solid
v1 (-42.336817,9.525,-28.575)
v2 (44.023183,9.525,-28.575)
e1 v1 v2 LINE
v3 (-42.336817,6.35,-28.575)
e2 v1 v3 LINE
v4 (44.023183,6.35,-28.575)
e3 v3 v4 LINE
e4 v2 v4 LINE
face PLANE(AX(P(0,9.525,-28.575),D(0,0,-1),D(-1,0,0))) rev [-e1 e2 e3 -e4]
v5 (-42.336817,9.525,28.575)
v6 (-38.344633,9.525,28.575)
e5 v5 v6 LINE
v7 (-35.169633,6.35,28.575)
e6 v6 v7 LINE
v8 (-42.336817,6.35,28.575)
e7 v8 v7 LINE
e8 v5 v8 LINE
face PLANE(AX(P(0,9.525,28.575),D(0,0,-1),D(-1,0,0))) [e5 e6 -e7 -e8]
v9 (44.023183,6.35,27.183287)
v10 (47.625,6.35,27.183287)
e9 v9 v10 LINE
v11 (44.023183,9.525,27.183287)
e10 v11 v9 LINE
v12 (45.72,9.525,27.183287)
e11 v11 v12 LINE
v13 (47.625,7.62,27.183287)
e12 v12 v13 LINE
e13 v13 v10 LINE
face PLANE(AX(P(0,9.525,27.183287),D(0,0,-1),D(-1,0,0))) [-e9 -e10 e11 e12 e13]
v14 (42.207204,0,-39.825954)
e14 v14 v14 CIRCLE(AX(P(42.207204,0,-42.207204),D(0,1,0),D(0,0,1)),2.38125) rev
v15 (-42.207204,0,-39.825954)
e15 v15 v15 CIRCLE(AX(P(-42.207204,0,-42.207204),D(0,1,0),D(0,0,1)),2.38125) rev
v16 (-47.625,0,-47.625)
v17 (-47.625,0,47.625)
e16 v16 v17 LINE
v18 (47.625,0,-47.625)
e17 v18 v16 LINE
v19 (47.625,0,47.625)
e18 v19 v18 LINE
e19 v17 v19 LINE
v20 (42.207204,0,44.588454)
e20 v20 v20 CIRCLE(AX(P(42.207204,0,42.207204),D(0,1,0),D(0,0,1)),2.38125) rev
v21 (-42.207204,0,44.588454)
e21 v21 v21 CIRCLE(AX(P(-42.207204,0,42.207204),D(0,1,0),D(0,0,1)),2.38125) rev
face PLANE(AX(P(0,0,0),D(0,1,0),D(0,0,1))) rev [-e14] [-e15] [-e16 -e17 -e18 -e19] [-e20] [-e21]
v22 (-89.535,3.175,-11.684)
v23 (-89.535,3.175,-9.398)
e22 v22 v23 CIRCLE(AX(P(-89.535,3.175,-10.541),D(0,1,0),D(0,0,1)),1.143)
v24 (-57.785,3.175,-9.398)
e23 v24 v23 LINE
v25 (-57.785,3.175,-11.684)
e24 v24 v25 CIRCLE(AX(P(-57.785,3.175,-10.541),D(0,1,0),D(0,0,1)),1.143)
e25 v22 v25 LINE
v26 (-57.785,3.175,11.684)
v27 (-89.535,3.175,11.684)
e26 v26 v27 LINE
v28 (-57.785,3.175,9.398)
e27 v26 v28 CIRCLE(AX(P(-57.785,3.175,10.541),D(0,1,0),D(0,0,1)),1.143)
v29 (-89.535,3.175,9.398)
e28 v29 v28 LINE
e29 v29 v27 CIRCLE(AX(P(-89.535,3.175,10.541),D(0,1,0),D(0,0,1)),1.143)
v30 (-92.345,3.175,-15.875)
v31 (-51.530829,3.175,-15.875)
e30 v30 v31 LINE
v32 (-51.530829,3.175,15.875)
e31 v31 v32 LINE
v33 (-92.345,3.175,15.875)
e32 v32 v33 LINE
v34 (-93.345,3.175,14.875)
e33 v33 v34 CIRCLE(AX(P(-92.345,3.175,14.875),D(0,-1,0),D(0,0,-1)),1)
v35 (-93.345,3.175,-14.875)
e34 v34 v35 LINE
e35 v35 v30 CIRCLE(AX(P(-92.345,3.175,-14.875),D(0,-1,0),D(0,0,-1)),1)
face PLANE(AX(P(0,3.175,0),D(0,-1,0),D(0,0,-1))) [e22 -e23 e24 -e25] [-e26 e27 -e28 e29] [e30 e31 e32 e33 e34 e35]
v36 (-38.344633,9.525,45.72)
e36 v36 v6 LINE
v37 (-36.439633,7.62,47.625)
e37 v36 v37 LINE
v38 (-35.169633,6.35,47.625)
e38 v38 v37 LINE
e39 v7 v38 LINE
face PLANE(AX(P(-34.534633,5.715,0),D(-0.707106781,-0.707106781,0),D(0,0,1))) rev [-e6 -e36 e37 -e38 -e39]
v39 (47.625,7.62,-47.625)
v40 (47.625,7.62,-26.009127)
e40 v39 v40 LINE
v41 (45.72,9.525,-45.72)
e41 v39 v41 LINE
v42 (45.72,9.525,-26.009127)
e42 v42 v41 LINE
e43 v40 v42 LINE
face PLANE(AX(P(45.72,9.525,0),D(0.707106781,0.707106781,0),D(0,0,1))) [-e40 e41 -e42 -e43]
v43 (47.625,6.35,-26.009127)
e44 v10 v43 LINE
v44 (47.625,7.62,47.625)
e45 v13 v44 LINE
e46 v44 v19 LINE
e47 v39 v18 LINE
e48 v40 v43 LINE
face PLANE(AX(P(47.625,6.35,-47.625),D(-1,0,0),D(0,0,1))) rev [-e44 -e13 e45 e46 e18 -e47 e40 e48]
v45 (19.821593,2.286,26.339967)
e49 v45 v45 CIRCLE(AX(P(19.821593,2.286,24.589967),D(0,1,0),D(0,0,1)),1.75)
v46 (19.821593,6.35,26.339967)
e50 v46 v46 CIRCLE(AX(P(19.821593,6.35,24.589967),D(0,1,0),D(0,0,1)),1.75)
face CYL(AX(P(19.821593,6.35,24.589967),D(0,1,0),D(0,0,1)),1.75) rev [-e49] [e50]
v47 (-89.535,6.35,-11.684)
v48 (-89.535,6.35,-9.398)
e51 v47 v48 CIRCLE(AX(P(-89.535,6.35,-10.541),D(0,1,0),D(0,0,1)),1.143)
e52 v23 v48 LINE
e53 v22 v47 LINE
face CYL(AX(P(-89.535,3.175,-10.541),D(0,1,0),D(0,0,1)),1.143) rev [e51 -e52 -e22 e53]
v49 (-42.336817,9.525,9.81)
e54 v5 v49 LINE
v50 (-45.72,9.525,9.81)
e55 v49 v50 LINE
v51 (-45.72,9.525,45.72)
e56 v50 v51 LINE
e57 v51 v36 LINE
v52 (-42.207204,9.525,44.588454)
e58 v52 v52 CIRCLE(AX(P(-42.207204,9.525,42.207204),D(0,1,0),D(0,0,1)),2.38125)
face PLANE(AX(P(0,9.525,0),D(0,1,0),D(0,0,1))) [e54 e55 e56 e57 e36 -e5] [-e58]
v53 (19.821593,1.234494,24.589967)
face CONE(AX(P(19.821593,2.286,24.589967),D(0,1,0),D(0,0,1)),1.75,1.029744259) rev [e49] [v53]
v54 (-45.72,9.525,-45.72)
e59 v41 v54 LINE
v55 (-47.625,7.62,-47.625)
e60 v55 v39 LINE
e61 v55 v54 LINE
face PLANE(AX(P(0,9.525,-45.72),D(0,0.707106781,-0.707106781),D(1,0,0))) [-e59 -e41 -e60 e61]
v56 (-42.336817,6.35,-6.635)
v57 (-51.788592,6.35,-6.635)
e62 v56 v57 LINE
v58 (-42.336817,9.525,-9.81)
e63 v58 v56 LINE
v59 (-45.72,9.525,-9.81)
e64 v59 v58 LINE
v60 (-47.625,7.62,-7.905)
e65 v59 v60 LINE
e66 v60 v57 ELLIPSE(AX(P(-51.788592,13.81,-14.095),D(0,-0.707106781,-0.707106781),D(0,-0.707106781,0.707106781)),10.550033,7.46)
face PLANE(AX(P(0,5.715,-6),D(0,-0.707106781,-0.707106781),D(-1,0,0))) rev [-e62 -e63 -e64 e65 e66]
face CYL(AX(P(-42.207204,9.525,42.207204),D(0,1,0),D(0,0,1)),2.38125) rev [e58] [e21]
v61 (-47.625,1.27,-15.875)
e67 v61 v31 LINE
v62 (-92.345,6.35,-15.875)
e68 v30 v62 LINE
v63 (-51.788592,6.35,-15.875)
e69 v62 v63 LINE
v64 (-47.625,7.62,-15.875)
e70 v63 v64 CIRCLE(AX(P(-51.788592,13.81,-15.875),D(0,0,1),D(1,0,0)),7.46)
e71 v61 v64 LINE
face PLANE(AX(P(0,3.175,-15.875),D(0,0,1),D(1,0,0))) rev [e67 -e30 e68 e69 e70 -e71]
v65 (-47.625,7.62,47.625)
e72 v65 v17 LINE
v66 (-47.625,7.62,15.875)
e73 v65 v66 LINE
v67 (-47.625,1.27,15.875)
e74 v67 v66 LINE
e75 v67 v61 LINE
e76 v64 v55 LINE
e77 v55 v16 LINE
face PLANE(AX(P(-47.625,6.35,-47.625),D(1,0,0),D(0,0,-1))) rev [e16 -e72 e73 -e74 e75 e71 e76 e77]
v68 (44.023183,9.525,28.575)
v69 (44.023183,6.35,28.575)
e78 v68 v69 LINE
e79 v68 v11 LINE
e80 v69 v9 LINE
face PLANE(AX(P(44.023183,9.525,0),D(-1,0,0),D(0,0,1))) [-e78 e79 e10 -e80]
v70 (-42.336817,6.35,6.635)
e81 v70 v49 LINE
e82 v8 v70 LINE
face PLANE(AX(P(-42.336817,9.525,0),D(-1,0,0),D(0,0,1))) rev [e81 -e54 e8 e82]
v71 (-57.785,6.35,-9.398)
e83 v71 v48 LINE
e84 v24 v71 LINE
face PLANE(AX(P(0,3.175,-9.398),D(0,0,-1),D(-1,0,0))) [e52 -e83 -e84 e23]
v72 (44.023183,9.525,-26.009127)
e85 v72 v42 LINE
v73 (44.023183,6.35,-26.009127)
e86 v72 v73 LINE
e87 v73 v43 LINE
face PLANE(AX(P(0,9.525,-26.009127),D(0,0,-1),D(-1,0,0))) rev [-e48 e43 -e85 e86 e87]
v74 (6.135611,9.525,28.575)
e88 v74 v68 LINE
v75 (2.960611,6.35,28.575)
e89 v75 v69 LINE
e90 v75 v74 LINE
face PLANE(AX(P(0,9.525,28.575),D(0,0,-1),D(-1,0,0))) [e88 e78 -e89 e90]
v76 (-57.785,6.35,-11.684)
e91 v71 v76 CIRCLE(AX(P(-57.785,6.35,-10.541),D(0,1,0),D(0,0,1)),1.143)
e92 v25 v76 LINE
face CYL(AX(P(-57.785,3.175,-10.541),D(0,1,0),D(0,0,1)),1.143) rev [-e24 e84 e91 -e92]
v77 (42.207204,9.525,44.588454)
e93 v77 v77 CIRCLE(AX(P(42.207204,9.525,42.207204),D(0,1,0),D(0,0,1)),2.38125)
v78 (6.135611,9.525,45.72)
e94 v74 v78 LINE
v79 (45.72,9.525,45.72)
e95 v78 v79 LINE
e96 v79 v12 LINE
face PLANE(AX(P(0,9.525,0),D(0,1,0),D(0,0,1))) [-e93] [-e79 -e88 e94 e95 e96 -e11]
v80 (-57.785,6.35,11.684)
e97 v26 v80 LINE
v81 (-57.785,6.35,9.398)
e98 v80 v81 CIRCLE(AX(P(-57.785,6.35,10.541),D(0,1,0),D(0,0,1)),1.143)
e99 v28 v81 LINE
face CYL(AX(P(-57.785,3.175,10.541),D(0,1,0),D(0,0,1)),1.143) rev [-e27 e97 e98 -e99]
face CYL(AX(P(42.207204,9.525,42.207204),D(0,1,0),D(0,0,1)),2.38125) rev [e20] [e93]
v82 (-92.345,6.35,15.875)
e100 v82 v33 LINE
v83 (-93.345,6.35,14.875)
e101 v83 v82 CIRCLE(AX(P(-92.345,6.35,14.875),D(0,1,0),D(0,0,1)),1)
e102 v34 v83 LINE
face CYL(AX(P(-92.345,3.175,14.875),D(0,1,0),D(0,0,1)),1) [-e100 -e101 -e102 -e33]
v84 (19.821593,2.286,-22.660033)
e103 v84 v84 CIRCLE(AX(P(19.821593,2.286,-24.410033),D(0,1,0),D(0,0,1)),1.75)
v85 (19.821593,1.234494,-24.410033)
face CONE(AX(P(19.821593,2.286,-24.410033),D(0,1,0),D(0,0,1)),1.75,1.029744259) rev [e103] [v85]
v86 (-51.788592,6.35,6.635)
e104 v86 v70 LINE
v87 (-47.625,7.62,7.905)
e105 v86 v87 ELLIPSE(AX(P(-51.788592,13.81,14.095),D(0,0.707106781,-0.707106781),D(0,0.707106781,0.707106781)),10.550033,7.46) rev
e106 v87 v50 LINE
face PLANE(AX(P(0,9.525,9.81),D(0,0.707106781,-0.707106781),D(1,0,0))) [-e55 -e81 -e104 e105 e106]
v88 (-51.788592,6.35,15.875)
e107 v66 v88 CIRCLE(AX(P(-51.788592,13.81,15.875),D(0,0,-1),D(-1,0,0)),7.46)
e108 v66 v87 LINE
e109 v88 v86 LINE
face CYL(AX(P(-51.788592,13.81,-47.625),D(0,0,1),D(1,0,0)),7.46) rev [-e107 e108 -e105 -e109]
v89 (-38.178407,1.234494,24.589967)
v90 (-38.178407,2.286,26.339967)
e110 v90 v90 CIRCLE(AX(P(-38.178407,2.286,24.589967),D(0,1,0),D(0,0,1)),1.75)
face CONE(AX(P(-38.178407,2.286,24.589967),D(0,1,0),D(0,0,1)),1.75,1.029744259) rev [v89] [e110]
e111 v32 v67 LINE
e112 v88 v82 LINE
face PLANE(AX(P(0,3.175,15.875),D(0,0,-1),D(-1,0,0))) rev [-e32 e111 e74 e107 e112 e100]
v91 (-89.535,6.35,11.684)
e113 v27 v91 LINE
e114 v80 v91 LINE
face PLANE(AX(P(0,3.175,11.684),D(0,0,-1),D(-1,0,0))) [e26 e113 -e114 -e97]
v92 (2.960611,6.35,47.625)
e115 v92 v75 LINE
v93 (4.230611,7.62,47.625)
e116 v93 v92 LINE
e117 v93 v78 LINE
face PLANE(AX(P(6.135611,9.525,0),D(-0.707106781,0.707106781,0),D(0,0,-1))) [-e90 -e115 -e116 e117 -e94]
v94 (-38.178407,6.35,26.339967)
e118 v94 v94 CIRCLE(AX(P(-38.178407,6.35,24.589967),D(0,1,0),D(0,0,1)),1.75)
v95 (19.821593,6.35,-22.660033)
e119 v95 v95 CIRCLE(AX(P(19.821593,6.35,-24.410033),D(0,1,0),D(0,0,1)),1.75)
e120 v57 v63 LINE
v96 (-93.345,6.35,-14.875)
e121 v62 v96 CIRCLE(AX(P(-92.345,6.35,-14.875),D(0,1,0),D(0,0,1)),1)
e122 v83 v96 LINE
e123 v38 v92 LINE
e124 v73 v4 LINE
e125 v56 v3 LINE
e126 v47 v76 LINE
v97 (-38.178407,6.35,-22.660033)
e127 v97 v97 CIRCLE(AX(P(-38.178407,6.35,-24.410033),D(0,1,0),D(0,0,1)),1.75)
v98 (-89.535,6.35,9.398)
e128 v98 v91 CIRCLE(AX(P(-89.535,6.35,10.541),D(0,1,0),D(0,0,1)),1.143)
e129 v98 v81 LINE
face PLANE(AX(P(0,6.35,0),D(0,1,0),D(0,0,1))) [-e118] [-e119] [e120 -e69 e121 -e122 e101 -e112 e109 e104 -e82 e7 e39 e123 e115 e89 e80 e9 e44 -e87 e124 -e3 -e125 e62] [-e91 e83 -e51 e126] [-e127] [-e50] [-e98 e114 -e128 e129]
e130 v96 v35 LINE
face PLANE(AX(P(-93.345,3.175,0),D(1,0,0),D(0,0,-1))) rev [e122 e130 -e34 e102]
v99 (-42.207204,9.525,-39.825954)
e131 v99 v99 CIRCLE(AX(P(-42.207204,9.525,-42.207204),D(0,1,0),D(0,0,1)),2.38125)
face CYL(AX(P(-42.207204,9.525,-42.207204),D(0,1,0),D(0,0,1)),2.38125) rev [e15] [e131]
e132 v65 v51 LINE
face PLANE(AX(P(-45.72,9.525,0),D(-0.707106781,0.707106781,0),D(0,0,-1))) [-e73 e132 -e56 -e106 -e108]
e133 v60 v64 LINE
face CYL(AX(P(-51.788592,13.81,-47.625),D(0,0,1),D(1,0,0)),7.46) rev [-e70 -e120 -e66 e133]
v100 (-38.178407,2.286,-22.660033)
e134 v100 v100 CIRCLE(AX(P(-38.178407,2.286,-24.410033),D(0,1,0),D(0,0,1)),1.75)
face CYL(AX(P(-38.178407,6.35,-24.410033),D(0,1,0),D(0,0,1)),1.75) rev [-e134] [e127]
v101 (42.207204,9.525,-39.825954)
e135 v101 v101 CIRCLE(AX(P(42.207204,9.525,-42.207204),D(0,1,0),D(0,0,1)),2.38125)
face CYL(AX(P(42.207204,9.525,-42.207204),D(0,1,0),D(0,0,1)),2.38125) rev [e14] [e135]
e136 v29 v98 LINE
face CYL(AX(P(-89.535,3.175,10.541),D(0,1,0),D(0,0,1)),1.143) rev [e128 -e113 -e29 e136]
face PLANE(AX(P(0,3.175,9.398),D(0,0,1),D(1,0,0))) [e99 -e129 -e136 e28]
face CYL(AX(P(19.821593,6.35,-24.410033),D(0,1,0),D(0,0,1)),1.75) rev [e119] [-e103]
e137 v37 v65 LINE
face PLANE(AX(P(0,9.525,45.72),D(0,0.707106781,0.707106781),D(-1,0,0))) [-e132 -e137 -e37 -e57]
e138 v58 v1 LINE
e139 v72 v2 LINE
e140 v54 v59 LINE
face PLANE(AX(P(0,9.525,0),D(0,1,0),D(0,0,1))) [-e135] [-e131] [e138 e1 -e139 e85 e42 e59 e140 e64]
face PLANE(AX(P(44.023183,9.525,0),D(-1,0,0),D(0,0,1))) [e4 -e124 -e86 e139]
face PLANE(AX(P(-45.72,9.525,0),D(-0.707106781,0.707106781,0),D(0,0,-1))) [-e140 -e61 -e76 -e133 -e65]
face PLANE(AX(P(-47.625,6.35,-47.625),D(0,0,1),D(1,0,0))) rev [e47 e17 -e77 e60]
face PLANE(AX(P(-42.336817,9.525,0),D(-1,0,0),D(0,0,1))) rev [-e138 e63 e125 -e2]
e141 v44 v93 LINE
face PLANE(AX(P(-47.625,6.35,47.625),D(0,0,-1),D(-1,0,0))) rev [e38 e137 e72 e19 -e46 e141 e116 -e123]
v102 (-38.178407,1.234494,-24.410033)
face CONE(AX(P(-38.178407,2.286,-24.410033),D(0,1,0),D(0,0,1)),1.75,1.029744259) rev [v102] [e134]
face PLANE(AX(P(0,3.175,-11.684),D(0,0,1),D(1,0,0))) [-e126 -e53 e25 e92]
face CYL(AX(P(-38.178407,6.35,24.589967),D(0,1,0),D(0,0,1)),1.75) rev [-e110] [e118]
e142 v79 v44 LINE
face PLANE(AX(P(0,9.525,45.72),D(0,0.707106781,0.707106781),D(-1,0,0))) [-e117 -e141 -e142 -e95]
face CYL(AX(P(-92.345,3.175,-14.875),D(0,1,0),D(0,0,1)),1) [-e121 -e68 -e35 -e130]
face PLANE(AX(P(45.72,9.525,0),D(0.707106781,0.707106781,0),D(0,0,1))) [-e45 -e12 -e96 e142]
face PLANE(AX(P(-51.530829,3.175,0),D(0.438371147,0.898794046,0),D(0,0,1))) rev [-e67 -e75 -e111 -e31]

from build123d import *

# Parameters (mm, degrees)
SKETCH1_W                          = 95.25
SKETCH1_H                          = 95.25
BASE_EXTRUDE_DEPTH                 = 6.35
PI_SLOT_DEPTH                      = 3.175
CHAMFER1_SIZE                      = 3.81
CHAMFER2_SIZE                      = 1.905
CAMERA_START                       = 6.35
SKETCH3_W                          = 45.72
SKETCH3_H                          = 31.75
CAMERA_SLOT_DEPTH                  = 3.175
FILLET1_R                          = 1
CHAMFER3_SIZE                      = 1.905
CHAMFER3_SIZE2                     = 3.905828818
FILLET2_R                          = 7.46
F_3_16_0_1875_DIAMETER_HOLE1_D     = 4.7625
F_3_16_0_1875_DIAMETER_HOLE1_DEPTH = 9.525
F_3_16_0_1875_DIAMETER_HOLE1_TIP   = 1.430799349
F_3_5_3_5_DIAMETER_HOLE1_D         = 3.5
F_3_5_3_5_DIAMETER_HOLE1_DEPTH     = 4.064
F_3_5_3_5_DIAMETER_HOLE1_TIP       = 1.051506083


with BuildPart() as part:
    # Sketch1 → Base Extrude (new body)
    with BuildSketch(Plane(origin=(0, 0, 0), x_dir=(1, 0, 0), z_dir=(0, 1, 0))):
        Rectangle(SKETCH1_W, SKETCH1_H)
    extrude(amount=BASE_EXTRUDE_DEPTH)

    # Sketch2 → Pi Slot (add)
    with BuildSketch(Plane(origin=(0, 6.35, 0), x_dir=(1, 0, 0), z_dir=(0, 1, 0))):
        Polygon((-34.534633186, -28.575), (-42.33681664, -28.575), (-42.33681664, -6), (-47.625, -6), (-47.625, -47.625), (-34.534633186, -47.625), align=None)
        Polygon((2.325611102, -28.575), (2.325611102, -47.625), (47.625, -47.625), (47.625, -27.183287233), (44.02318336, -27.183287233), (44.02318336, -28.575), align=None)
        Polygon((-47.625, 47.625), (-47.625, 6), (-42.33681664, 6), (-42.33681664, 28.575), (44.02318336, 28.575), (44.02318336, 26.009127411), (47.625, 26.009127411), (47.625, 47.625), align=None)
    extrude(amount=PI_SLOT_DEPTH)

    # Chamfer1
    # the kernel refuses this chamfer: 3.81 mm, written as the material it takes off along each edge
    with BuildSketch(Plane(origin=(2.325611102, 9.525, 18.776887816), x_dir=(-0.027495876610586382, -0.9996219169112968, 0), z_dir=(0, 0, 1))) as chamfer1_piece_1_section:
        Polygon((CHAMFER1_SIZE * 0.999621916911, CHAMFER1_SIZE * 0.0274958766106), (-CHAMFER1_SIZE * 0.0274958766106, CHAMFER1_SIZE * 0.999621916911), (0, 0), align=None)
    chamfer1_piece_1 = extrude(amount=38.646224368, mode=Mode.PRIVATE)
    chamfer1_piece_1 = split(chamfer1_piece_1, bisect_by=Plane(origin=(3.62873216, 6.35, 38.1), z_dir=(0, 1, 0)), keep=Keep.TOP, mode=Mode.PRIVATE)
    add(chamfer1_piece_1, mode=Mode.SUBTRACT)
    with BuildSketch(Plane(origin=(-34.534633186, 9.525, 57.423112184), x_dir=(-0.9996219169112968, 0.02749587661058636, 0), z_dir=(0, 0, -1))) as chamfer1_piece_2_section:
        Polygon((CHAMFER1_SIZE * 0.999621916911, -CHAMFER1_SIZE * 0.0274958766106), (-CHAMFER1_SIZE * 0.0274958766106, -CHAMFER1_SIZE * 0.999621916911), (0, 0), align=None)
    chamfer1_piece_2 = extrude(amount=38.646224368, mode=Mode.PRIVATE)
    chamfer1_piece_2 = split(chamfer1_piece_2, bisect_by=Plane(origin=(-35.837754245, 6.35, 38.1), z_dir=(0, 1, 0)), keep=Keep.TOP, mode=Mode.PRIVATE)
    add(chamfer1_piece_2, mode=Mode.SUBTRACT)
    with BuildSketch(Plane(origin=(-32.538704456, 9.525, 6), x_dir=(0, 0.027495876610586386, 0.9996219169112968), z_dir=(-1, 0, 0))) as chamfer1_piece_3_section:
        Polygon((CHAMFER1_SIZE * 0.999621916911, -CHAMFER1_SIZE * 0.0274958766106), (-CHAMFER1_SIZE * 0.0274958766106, -CHAMFER1_SIZE * 0.999621916911), (0, 0), align=None)
    chamfer1_piece_3 = extrude(amount=24.884407728, mode=Mode.PRIVATE)
    chamfer1_piece_3 = split(chamfer1_piece_3, bisect_by=Plane(origin=(-44.98090832, 6.35, 7.303121058), z_dir=(0, 1, 0)), keep=Keep.TOP, mode=Mode.PRIVATE)
    add(chamfer1_piece_3, mode=Mode.SUBTRACT)
    with BuildSketch(Plane(origin=(-57.423112184, 9.525, -6), x_dir=(0, -0.9996219169112968, 0.027495876610586382), z_dir=(1, 0, 0))) as chamfer1_piece_4_section:
        Polygon((CHAMFER1_SIZE * 0.999621916911, CHAMFER1_SIZE * 0.0274958766106), (-CHAMFER1_SIZE * 0.0274958766106, CHAMFER1_SIZE * 0.999621916911), (0, 0), align=None)
    chamfer1_piece_4 = extrude(amount=24.884407728, mode=Mode.PRIVATE)
    chamfer1_piece_4 = split(chamfer1_piece_4, bisect_by=Plane(origin=(-44.98090832, 6.35, -7.303121058), z_dir=(0, 1, 0)), keep=Keep.TOP, mode=Mode.PRIVATE)
    add(chamfer1_piece_4, mode=Mode.SUBTRACT)

    # Chamfer2
    chamfer2_edges = [part.edges().sort_by_distance(p)[0] for p in [
        (-42.984816593, 9.525, 47.625),
        (47.625, 9.525, 37.404143616),
        (47.625, 9.525, -36.817063706),
        (0, 9.525, -47.625),
        (-47.625, 9.525, -28.7175),
        (26.880305551, 9.525, 47.625),
        (-47.625, 9.525, 28.7175),
    ]]
    chamfer(chamfer2_edges, length=CHAMFER2_SIZE)

    # Sketch3 → Camera Slot (add)
    with BuildSketch(Plane(origin=(0, 0, 0), x_dir=(1, 0, 0), z_dir=(0, 1, 0)).offset(CAMERA_START)):
        with Locations((-70.485, 0)):
            Rectangle(SKETCH3_W, SKETCH3_H)
        with BuildLine():
            Line((-89.535, 11.684), (-57.785, 11.684))
            ThreePointArc((-57.785, 11.684), (-56.642, 10.541), (-57.785, 9.398))
            Line((-57.785, 9.398), (-89.535, 9.398))
            ThreePointArc((-89.535, 9.398), (-90.678, 10.541), (-89.535, 11.684))
        make_face(mode=Mode.SUBTRACT)
        with BuildLine():
            Line((-89.535, -11.684), (-57.785, -11.684))
            ThreePointArc((-57.785, -11.684), (-56.642, -10.541), (-57.785, -9.398))
            Line((-57.785, -9.398), (-89.535, -9.398))
            ThreePointArc((-89.535, -9.398), (-90.678, -10.541), (-89.535, -11.684))
        make_face(mode=Mode.SUBTRACT)
    extrude(amount=-CAMERA_SLOT_DEPTH)

    # Fillet1
    fillet1_edges = [part.edges().sort_by_distance(p)[0] for p in [
        (-93.345, 4.7625, -15.875),
        (-93.345, 4.7625, 15.875),
    ]]
    fillet(fillet1_edges, radius=FILLET1_R)

    # Chamfer3
    chamfer3_edges = [part.edges().sort_by_distance(p)[0] for p in [
        (-47.625, 3.175, 0),
    ]]
    chamfer3_side = [part.faces().sort_by_distance(p)[0] for p in [
        (-47.625, 3.81, 46.669456861),
    ]]
    chamfer(chamfer3_edges, length=CHAMFER3_SIZE, length2=CHAMFER3_SIZE2, reference=chamfer3_side[0])

    # Fillet2
    # the kernel refuses this fillet: 7.46 mm, written as the material it adds along each edge
    with BuildSketch(Plane(origin=(-47.625, 6.35, -15.875), x_dir=(-1, 0, 0), z_dir=(0, 0, 1))) as fillet2_piece_1_section:
        with BuildLine():
            CenterArc((4.163592199, -7.46), FILLET2_R, 90, 33.926040017)
            Line((0, -1.27), (0, 0))
            Line((0, 0), (4.163592199, 0))
        make_face()
    fillet2_piece_1 = extrude(amount=19.648980498, mode=Mode.PRIVATE)
    fillet2_piece_1 = split(fillet2_piece_1, bisect_by=Plane(origin=(-49.607751226, 8.8151447, -9.1001447), z_dir=(0, -0.7071067811868302, -0.7071067811862648)), keep=Keep.TOP, mode=Mode.PRIVATE)
    add(fillet2_piece_1)
    with BuildSketch(Plane(origin=(-47.625, 6.35, -3.773980498), x_dir=(-1, 0, 0), z_dir=(0, 0, 1))) as fillet2_piece_2_section:
        with BuildLine():
            CenterArc((4.163592199, -7.46), FILLET2_R, 90, 33.926040017)
            Line((0, -1.27), (0, 0))
            Line((0, 0), (4.163592199, 0))
        make_face()
    fillet2_piece_2 = extrude(amount=19.648980498, mode=Mode.PRIVATE)
    fillet2_piece_2 = split(fillet2_piece_2, bisect_by=Plane(origin=(-49.607751226, 8.8151447, 9.1001447), z_dir=(0, -0.7071067811862648, 0.7071067811868302)), keep=Keep.TOP, mode=Mode.PRIVATE)
    add(fillet2_piece_2)

    # 3/16 (0.1875) Diameter Hole1
    with Locations(Plane(origin=(0, 9.525, 0), x_dir=(1, 0, 0), z_dir=(0, 1, 0))):
        with Locations((-42.207203769, 42.207203769), (42.207203769, 42.207203769), (42.207203769, -42.207203769), (-42.207203769, -42.207203769)):
            Hole(F_3_16_0_1875_DIAMETER_HOLE1_D / 2, depth=F_3_16_0_1875_DIAMETER_HOLE1_DEPTH)
            with Locations((0, 0, -(F_3_16_0_1875_DIAMETER_HOLE1_DEPTH + F_3_16_0_1875_DIAMETER_HOLE1_TIP / 2))):  # 118° drill point
                Cone(0, F_3_16_0_1875_DIAMETER_HOLE1_D / 2, F_3_16_0_1875_DIAMETER_HOLE1_TIP, mode=Mode.SUBTRACT)

    # Ø3.5 (3.5) Diameter Hole1
    with Locations(Plane(origin=(0, 6.35, 0), x_dir=(1, 0, 0), z_dir=(0, 1, 0))):
        with Locations((-38.178407454, 24.41003259), (19.821592546, 24.41003259), (19.821592546, -24.589967454), (-38.178407454, -24.589967454)):
            Hole(F_3_5_3_5_DIAMETER_HOLE1_D / 2, depth=F_3_5_3_5_DIAMETER_HOLE1_DEPTH)
            with Locations((0, 0, -(F_3_5_3_5_DIAMETER_HOLE1_DEPTH + F_3_5_3_5_DIAMETER_HOLE1_TIP / 2))):  # 118° drill point
                Cone(0, F_3_5_3_5_DIAMETER_HOLE1_D / 2, F_3_5_3_5_DIAMETER_HOLE1_TIP, mode=Mode.SUBTRACT)


solid = part.part
